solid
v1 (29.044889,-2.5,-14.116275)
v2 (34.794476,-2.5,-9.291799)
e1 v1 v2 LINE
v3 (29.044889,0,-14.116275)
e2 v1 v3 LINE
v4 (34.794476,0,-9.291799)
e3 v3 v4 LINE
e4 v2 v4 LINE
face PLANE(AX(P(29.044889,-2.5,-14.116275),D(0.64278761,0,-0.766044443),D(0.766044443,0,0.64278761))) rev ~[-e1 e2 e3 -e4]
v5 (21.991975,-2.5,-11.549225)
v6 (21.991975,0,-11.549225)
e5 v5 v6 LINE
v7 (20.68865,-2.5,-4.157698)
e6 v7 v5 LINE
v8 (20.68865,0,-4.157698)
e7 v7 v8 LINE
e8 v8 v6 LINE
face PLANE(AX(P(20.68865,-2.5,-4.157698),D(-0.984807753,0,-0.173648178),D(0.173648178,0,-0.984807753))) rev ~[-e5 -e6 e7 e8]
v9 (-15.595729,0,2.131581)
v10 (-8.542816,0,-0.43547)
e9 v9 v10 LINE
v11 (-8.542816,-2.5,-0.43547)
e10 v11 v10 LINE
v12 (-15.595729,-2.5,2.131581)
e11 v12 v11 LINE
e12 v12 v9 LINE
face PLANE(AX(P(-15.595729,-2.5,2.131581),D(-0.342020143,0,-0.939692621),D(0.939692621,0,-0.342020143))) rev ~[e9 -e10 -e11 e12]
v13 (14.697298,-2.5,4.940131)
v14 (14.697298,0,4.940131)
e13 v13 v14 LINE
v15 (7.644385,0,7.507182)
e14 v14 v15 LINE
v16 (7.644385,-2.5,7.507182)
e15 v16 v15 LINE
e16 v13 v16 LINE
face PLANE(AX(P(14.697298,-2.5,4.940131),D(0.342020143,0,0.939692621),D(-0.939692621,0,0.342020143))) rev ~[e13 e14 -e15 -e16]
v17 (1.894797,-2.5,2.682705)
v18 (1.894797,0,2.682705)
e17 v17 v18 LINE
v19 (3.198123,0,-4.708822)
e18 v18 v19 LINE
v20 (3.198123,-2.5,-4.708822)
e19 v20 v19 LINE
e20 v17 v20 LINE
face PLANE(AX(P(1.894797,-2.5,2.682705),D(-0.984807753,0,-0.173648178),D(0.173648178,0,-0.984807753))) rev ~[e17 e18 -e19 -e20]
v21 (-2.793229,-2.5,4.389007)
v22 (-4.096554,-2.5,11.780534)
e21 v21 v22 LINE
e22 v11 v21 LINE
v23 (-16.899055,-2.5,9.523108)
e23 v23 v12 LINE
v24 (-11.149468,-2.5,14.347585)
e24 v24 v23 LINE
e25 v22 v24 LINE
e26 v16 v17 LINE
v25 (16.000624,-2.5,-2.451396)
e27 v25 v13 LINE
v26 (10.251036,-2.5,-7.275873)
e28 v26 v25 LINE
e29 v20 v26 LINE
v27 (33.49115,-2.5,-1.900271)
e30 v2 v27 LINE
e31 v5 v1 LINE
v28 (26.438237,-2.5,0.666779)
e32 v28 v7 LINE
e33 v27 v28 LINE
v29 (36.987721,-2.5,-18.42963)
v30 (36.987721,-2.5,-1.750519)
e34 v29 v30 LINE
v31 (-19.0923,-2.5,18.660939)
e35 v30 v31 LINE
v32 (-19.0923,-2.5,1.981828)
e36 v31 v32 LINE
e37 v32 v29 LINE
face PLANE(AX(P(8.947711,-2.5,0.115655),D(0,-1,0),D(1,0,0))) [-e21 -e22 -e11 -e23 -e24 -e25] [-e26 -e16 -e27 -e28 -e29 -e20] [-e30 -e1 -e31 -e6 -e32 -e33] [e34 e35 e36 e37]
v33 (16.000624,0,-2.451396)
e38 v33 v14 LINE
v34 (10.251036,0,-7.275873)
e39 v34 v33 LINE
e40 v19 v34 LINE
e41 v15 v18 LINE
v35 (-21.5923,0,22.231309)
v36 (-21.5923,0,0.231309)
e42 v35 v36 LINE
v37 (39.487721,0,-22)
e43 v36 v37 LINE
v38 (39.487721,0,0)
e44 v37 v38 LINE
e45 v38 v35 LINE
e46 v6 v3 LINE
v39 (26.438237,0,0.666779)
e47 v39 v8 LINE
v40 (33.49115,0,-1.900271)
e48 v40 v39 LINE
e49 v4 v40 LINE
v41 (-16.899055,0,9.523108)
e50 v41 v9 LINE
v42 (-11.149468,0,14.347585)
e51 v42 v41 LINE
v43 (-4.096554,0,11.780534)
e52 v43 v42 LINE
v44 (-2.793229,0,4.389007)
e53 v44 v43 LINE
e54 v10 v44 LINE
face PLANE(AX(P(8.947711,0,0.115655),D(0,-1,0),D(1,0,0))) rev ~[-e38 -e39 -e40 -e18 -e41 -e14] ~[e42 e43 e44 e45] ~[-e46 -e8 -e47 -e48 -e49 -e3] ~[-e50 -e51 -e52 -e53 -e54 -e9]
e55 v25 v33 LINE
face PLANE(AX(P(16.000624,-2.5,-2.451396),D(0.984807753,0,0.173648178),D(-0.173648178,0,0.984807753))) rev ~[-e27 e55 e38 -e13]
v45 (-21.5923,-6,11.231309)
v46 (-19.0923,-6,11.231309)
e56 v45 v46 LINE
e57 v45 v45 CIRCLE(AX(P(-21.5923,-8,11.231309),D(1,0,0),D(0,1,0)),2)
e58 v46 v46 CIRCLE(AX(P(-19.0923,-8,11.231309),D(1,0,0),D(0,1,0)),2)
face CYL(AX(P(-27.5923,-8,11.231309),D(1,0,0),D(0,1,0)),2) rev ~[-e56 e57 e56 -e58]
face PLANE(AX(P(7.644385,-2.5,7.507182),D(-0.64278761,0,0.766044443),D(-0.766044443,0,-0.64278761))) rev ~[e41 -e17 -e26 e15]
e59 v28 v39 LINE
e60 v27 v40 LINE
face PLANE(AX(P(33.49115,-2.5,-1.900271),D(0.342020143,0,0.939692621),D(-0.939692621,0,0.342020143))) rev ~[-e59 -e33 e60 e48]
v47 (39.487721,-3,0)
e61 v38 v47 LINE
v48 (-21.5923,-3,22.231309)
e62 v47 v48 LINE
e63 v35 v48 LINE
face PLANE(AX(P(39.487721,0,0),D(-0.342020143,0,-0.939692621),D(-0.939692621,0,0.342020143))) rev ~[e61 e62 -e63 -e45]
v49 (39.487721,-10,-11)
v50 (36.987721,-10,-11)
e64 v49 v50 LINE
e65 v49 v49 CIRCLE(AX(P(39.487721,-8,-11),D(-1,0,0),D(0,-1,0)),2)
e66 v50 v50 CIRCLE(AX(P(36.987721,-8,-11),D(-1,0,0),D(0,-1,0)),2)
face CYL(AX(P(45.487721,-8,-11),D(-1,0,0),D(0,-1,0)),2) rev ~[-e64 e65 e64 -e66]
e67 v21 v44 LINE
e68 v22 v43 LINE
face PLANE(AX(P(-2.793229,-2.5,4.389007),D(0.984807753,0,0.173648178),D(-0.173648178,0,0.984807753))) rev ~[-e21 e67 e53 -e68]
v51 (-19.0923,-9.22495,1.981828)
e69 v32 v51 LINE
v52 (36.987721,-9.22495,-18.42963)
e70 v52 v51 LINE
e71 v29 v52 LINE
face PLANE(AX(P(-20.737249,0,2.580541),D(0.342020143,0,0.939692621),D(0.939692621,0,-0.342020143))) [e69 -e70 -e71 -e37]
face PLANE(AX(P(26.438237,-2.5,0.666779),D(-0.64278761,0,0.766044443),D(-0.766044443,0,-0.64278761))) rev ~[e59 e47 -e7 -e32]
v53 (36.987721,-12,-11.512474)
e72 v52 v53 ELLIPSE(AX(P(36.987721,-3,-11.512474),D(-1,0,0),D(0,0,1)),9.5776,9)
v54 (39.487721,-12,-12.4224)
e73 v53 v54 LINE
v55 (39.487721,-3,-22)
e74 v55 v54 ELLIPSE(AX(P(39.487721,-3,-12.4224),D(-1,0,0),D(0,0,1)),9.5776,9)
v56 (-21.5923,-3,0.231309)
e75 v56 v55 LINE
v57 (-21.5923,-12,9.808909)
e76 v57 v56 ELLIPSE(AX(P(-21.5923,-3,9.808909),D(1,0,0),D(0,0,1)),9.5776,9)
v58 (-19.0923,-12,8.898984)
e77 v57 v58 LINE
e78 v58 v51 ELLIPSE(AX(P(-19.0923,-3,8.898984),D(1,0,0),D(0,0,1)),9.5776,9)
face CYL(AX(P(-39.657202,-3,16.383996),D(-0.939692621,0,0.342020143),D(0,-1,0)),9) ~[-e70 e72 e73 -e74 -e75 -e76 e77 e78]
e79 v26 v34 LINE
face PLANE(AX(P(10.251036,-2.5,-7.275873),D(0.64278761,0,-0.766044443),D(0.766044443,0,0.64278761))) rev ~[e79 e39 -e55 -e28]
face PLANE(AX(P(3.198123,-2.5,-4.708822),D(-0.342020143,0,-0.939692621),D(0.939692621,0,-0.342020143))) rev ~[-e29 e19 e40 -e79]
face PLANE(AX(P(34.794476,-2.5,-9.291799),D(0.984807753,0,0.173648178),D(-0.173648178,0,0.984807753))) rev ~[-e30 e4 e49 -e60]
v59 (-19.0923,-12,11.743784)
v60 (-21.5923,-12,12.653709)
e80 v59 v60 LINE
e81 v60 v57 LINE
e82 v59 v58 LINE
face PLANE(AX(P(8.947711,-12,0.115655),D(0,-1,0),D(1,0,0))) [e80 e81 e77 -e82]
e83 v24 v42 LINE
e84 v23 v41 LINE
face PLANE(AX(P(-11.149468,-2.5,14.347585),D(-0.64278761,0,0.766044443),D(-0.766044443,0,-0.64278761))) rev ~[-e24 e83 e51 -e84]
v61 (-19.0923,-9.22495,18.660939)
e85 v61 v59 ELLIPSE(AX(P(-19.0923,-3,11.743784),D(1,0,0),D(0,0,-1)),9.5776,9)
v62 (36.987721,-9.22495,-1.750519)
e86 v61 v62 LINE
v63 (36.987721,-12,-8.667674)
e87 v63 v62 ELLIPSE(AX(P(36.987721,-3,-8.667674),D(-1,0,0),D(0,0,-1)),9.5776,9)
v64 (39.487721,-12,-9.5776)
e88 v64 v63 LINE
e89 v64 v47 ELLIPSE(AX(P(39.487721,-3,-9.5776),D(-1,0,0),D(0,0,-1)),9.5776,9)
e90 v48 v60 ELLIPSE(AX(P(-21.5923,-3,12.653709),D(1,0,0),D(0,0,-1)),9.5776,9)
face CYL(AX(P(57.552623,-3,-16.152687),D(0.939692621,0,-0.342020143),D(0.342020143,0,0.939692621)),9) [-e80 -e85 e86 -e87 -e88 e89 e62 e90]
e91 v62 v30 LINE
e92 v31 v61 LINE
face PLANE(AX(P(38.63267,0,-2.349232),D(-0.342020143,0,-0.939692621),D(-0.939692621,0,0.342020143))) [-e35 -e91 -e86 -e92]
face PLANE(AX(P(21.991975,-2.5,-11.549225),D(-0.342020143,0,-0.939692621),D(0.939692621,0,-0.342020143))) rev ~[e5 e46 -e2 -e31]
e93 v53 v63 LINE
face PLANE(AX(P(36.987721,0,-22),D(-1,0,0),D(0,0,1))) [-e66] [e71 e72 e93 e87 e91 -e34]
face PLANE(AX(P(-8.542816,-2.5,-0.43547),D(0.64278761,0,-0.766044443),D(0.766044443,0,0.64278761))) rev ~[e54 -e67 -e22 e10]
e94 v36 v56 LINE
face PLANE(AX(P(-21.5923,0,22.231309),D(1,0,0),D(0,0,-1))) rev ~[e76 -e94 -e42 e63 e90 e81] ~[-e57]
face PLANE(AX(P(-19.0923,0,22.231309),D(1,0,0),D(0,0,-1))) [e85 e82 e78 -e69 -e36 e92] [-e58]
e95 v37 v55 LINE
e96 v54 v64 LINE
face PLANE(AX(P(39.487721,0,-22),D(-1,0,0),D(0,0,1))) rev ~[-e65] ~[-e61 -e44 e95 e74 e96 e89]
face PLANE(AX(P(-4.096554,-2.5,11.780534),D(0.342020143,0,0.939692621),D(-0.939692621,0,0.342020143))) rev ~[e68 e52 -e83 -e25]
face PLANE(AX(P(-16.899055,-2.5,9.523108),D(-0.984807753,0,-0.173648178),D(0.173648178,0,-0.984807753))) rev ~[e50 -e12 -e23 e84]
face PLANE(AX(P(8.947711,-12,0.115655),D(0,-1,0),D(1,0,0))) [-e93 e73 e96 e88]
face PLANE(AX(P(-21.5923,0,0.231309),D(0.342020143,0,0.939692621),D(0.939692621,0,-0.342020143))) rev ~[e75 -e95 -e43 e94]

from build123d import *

# Parameters (mm, degrees)
F1_DEPTH    = 12
F2_T        = -2.5
F4_D        = 4
F4_DEPTH    = 6
F4_TIP      = 1.2017212381
F6_D        = 4
F6_DEPTH    = 6
F6_TIP      = 1.2017212381
F7_T1_DEPTH = 110
F7_T3_DEPTH = 110
F9_DEPTH    = 25


# Not quite as in the source:
# - a fillet or chamfer that OpenCascade refuses, or shapes differently, is made with other operations: its cross-section is extruded or revolved along the edge and cut away or added


with BuildPart() as f1:
    # F0 (on Front) → F1 (new body)
    with BuildSketch(Plane.XZ):
        Polygon((39.4877206884, 0), (-21.5922996627, 22.2313093162), (-21.5922996627, 0.2313093162), (39.4877206884, -22), align=None)
    extrude(amount=F1_DEPTH)

    # F2
    f2_openings = [f1.faces().sort_by_distance(p)[0] for p in [
        (8.947711, -12, 0.115655),
    ]]
    offset(amount=F2_T, openings=f2_openings)

    # F4
    with Locations(Plane(origin=(-21.5922996627, 0, 0), x_dir=(0, -1, 0), z_dir=(-1, 0, 0))):
        with Locations((8, 11.2313093162)):
            Hole(F4_D / 2, depth=F4_DEPTH)
            with Locations((0, 0, -(F4_DEPTH + F4_TIP / 2))):  # 118° drill point
                Cone(0, F4_D / 2, F4_TIP, mode=Mode.SUBTRACT)

    # F6
    with Locations(Plane.YZ.offset(39.4877206884)):
        with Locations((-8, -11)):
            Hole(F6_D / 2, depth=F6_DEPTH)
            with Locations((0, 0, -(F6_DEPTH + F6_TIP / 2))):  # 118° drill point
                Cone(0, F6_D / 2, F6_TIP, mode=Mode.SUBTRACT)

    # F7: fillet of radius 9 on 2 edges, made by hand

    # F7_s2 → F7_t1 (cut)
    with BuildSketch(Plane(origin=(56.0116188142, 0, -20.3865620214), x_dir=(0, 1, 0), z_dir=(-0.9396926208, 0, 0.3420201433))):
        with BuildLine():
            ThreePointArc((-3, -13.5055958894), (-9.3639610307, -10.8695569201), (-12, -4.5055958894))
            Line((-12, -4.5055958894), (-12, -13.5055958894))
            Line((-12, -13.5055958894), (-3, -13.5055958894))
        make_face()
    extrude(amount=F7_T1_DEPTH, mode=Mode.SUBTRACT)

    # F7_s4 → F7_t3 (cut)
    with BuildSketch(Plane(origin=(-40.2839057657, 0, 14.6621426187), x_dir=(0, 1, 0), z_dir=(0.9396926208, 0, -0.3420201433))):
        with BuildLine():
            ThreePointArc((-12, 1.8323582321), (-9.3639610307, -4.5316027985), (-3, -7.1676417679))
            Line((-3, -7.1676417679), (-12, -7.1676417679))
            Line((-12, -7.1676417679), (-12, 1.8323582321))
        make_face()
    extrude(amount=F7_T3_DEPTH, mode=Mode.SUBTRACT)

    # F8 (on face) → F9 (cut)
    with BuildSketch(Plane.XZ.offset(2.5)):
        Polygon((-8.5428162153, -0.4354697523), (-2.7932286645, 4.389007041), (-4.0965543521, 11.7805343179), (-11.1494675905, 14.3475848015), (-16.8990551413, 9.5231080082), (-15.5957294537, 2.1315807313), align=None)
        Polygon((10.2510362004, -7.2758726188), (16.0006237512, -2.4513958255), (14.6972980636, 4.9401314514), (7.6443848253, 7.507181935), (1.8947972745, 2.6827051417), (3.198122962, -4.7088221352), align=None)
        Polygon((29.0448886161, -14.1162754854), (34.7944761669, -9.2917986921), (33.4911504793, -1.9002714151), (26.438237241, 0.6667790685), (20.6886496902, -4.1576977248), (21.9919753777, -11.5492250017), align=None)
    extrude(amount=-F9_DEPTH, mode=Mode.SUBTRACT)


solid = f1.part
